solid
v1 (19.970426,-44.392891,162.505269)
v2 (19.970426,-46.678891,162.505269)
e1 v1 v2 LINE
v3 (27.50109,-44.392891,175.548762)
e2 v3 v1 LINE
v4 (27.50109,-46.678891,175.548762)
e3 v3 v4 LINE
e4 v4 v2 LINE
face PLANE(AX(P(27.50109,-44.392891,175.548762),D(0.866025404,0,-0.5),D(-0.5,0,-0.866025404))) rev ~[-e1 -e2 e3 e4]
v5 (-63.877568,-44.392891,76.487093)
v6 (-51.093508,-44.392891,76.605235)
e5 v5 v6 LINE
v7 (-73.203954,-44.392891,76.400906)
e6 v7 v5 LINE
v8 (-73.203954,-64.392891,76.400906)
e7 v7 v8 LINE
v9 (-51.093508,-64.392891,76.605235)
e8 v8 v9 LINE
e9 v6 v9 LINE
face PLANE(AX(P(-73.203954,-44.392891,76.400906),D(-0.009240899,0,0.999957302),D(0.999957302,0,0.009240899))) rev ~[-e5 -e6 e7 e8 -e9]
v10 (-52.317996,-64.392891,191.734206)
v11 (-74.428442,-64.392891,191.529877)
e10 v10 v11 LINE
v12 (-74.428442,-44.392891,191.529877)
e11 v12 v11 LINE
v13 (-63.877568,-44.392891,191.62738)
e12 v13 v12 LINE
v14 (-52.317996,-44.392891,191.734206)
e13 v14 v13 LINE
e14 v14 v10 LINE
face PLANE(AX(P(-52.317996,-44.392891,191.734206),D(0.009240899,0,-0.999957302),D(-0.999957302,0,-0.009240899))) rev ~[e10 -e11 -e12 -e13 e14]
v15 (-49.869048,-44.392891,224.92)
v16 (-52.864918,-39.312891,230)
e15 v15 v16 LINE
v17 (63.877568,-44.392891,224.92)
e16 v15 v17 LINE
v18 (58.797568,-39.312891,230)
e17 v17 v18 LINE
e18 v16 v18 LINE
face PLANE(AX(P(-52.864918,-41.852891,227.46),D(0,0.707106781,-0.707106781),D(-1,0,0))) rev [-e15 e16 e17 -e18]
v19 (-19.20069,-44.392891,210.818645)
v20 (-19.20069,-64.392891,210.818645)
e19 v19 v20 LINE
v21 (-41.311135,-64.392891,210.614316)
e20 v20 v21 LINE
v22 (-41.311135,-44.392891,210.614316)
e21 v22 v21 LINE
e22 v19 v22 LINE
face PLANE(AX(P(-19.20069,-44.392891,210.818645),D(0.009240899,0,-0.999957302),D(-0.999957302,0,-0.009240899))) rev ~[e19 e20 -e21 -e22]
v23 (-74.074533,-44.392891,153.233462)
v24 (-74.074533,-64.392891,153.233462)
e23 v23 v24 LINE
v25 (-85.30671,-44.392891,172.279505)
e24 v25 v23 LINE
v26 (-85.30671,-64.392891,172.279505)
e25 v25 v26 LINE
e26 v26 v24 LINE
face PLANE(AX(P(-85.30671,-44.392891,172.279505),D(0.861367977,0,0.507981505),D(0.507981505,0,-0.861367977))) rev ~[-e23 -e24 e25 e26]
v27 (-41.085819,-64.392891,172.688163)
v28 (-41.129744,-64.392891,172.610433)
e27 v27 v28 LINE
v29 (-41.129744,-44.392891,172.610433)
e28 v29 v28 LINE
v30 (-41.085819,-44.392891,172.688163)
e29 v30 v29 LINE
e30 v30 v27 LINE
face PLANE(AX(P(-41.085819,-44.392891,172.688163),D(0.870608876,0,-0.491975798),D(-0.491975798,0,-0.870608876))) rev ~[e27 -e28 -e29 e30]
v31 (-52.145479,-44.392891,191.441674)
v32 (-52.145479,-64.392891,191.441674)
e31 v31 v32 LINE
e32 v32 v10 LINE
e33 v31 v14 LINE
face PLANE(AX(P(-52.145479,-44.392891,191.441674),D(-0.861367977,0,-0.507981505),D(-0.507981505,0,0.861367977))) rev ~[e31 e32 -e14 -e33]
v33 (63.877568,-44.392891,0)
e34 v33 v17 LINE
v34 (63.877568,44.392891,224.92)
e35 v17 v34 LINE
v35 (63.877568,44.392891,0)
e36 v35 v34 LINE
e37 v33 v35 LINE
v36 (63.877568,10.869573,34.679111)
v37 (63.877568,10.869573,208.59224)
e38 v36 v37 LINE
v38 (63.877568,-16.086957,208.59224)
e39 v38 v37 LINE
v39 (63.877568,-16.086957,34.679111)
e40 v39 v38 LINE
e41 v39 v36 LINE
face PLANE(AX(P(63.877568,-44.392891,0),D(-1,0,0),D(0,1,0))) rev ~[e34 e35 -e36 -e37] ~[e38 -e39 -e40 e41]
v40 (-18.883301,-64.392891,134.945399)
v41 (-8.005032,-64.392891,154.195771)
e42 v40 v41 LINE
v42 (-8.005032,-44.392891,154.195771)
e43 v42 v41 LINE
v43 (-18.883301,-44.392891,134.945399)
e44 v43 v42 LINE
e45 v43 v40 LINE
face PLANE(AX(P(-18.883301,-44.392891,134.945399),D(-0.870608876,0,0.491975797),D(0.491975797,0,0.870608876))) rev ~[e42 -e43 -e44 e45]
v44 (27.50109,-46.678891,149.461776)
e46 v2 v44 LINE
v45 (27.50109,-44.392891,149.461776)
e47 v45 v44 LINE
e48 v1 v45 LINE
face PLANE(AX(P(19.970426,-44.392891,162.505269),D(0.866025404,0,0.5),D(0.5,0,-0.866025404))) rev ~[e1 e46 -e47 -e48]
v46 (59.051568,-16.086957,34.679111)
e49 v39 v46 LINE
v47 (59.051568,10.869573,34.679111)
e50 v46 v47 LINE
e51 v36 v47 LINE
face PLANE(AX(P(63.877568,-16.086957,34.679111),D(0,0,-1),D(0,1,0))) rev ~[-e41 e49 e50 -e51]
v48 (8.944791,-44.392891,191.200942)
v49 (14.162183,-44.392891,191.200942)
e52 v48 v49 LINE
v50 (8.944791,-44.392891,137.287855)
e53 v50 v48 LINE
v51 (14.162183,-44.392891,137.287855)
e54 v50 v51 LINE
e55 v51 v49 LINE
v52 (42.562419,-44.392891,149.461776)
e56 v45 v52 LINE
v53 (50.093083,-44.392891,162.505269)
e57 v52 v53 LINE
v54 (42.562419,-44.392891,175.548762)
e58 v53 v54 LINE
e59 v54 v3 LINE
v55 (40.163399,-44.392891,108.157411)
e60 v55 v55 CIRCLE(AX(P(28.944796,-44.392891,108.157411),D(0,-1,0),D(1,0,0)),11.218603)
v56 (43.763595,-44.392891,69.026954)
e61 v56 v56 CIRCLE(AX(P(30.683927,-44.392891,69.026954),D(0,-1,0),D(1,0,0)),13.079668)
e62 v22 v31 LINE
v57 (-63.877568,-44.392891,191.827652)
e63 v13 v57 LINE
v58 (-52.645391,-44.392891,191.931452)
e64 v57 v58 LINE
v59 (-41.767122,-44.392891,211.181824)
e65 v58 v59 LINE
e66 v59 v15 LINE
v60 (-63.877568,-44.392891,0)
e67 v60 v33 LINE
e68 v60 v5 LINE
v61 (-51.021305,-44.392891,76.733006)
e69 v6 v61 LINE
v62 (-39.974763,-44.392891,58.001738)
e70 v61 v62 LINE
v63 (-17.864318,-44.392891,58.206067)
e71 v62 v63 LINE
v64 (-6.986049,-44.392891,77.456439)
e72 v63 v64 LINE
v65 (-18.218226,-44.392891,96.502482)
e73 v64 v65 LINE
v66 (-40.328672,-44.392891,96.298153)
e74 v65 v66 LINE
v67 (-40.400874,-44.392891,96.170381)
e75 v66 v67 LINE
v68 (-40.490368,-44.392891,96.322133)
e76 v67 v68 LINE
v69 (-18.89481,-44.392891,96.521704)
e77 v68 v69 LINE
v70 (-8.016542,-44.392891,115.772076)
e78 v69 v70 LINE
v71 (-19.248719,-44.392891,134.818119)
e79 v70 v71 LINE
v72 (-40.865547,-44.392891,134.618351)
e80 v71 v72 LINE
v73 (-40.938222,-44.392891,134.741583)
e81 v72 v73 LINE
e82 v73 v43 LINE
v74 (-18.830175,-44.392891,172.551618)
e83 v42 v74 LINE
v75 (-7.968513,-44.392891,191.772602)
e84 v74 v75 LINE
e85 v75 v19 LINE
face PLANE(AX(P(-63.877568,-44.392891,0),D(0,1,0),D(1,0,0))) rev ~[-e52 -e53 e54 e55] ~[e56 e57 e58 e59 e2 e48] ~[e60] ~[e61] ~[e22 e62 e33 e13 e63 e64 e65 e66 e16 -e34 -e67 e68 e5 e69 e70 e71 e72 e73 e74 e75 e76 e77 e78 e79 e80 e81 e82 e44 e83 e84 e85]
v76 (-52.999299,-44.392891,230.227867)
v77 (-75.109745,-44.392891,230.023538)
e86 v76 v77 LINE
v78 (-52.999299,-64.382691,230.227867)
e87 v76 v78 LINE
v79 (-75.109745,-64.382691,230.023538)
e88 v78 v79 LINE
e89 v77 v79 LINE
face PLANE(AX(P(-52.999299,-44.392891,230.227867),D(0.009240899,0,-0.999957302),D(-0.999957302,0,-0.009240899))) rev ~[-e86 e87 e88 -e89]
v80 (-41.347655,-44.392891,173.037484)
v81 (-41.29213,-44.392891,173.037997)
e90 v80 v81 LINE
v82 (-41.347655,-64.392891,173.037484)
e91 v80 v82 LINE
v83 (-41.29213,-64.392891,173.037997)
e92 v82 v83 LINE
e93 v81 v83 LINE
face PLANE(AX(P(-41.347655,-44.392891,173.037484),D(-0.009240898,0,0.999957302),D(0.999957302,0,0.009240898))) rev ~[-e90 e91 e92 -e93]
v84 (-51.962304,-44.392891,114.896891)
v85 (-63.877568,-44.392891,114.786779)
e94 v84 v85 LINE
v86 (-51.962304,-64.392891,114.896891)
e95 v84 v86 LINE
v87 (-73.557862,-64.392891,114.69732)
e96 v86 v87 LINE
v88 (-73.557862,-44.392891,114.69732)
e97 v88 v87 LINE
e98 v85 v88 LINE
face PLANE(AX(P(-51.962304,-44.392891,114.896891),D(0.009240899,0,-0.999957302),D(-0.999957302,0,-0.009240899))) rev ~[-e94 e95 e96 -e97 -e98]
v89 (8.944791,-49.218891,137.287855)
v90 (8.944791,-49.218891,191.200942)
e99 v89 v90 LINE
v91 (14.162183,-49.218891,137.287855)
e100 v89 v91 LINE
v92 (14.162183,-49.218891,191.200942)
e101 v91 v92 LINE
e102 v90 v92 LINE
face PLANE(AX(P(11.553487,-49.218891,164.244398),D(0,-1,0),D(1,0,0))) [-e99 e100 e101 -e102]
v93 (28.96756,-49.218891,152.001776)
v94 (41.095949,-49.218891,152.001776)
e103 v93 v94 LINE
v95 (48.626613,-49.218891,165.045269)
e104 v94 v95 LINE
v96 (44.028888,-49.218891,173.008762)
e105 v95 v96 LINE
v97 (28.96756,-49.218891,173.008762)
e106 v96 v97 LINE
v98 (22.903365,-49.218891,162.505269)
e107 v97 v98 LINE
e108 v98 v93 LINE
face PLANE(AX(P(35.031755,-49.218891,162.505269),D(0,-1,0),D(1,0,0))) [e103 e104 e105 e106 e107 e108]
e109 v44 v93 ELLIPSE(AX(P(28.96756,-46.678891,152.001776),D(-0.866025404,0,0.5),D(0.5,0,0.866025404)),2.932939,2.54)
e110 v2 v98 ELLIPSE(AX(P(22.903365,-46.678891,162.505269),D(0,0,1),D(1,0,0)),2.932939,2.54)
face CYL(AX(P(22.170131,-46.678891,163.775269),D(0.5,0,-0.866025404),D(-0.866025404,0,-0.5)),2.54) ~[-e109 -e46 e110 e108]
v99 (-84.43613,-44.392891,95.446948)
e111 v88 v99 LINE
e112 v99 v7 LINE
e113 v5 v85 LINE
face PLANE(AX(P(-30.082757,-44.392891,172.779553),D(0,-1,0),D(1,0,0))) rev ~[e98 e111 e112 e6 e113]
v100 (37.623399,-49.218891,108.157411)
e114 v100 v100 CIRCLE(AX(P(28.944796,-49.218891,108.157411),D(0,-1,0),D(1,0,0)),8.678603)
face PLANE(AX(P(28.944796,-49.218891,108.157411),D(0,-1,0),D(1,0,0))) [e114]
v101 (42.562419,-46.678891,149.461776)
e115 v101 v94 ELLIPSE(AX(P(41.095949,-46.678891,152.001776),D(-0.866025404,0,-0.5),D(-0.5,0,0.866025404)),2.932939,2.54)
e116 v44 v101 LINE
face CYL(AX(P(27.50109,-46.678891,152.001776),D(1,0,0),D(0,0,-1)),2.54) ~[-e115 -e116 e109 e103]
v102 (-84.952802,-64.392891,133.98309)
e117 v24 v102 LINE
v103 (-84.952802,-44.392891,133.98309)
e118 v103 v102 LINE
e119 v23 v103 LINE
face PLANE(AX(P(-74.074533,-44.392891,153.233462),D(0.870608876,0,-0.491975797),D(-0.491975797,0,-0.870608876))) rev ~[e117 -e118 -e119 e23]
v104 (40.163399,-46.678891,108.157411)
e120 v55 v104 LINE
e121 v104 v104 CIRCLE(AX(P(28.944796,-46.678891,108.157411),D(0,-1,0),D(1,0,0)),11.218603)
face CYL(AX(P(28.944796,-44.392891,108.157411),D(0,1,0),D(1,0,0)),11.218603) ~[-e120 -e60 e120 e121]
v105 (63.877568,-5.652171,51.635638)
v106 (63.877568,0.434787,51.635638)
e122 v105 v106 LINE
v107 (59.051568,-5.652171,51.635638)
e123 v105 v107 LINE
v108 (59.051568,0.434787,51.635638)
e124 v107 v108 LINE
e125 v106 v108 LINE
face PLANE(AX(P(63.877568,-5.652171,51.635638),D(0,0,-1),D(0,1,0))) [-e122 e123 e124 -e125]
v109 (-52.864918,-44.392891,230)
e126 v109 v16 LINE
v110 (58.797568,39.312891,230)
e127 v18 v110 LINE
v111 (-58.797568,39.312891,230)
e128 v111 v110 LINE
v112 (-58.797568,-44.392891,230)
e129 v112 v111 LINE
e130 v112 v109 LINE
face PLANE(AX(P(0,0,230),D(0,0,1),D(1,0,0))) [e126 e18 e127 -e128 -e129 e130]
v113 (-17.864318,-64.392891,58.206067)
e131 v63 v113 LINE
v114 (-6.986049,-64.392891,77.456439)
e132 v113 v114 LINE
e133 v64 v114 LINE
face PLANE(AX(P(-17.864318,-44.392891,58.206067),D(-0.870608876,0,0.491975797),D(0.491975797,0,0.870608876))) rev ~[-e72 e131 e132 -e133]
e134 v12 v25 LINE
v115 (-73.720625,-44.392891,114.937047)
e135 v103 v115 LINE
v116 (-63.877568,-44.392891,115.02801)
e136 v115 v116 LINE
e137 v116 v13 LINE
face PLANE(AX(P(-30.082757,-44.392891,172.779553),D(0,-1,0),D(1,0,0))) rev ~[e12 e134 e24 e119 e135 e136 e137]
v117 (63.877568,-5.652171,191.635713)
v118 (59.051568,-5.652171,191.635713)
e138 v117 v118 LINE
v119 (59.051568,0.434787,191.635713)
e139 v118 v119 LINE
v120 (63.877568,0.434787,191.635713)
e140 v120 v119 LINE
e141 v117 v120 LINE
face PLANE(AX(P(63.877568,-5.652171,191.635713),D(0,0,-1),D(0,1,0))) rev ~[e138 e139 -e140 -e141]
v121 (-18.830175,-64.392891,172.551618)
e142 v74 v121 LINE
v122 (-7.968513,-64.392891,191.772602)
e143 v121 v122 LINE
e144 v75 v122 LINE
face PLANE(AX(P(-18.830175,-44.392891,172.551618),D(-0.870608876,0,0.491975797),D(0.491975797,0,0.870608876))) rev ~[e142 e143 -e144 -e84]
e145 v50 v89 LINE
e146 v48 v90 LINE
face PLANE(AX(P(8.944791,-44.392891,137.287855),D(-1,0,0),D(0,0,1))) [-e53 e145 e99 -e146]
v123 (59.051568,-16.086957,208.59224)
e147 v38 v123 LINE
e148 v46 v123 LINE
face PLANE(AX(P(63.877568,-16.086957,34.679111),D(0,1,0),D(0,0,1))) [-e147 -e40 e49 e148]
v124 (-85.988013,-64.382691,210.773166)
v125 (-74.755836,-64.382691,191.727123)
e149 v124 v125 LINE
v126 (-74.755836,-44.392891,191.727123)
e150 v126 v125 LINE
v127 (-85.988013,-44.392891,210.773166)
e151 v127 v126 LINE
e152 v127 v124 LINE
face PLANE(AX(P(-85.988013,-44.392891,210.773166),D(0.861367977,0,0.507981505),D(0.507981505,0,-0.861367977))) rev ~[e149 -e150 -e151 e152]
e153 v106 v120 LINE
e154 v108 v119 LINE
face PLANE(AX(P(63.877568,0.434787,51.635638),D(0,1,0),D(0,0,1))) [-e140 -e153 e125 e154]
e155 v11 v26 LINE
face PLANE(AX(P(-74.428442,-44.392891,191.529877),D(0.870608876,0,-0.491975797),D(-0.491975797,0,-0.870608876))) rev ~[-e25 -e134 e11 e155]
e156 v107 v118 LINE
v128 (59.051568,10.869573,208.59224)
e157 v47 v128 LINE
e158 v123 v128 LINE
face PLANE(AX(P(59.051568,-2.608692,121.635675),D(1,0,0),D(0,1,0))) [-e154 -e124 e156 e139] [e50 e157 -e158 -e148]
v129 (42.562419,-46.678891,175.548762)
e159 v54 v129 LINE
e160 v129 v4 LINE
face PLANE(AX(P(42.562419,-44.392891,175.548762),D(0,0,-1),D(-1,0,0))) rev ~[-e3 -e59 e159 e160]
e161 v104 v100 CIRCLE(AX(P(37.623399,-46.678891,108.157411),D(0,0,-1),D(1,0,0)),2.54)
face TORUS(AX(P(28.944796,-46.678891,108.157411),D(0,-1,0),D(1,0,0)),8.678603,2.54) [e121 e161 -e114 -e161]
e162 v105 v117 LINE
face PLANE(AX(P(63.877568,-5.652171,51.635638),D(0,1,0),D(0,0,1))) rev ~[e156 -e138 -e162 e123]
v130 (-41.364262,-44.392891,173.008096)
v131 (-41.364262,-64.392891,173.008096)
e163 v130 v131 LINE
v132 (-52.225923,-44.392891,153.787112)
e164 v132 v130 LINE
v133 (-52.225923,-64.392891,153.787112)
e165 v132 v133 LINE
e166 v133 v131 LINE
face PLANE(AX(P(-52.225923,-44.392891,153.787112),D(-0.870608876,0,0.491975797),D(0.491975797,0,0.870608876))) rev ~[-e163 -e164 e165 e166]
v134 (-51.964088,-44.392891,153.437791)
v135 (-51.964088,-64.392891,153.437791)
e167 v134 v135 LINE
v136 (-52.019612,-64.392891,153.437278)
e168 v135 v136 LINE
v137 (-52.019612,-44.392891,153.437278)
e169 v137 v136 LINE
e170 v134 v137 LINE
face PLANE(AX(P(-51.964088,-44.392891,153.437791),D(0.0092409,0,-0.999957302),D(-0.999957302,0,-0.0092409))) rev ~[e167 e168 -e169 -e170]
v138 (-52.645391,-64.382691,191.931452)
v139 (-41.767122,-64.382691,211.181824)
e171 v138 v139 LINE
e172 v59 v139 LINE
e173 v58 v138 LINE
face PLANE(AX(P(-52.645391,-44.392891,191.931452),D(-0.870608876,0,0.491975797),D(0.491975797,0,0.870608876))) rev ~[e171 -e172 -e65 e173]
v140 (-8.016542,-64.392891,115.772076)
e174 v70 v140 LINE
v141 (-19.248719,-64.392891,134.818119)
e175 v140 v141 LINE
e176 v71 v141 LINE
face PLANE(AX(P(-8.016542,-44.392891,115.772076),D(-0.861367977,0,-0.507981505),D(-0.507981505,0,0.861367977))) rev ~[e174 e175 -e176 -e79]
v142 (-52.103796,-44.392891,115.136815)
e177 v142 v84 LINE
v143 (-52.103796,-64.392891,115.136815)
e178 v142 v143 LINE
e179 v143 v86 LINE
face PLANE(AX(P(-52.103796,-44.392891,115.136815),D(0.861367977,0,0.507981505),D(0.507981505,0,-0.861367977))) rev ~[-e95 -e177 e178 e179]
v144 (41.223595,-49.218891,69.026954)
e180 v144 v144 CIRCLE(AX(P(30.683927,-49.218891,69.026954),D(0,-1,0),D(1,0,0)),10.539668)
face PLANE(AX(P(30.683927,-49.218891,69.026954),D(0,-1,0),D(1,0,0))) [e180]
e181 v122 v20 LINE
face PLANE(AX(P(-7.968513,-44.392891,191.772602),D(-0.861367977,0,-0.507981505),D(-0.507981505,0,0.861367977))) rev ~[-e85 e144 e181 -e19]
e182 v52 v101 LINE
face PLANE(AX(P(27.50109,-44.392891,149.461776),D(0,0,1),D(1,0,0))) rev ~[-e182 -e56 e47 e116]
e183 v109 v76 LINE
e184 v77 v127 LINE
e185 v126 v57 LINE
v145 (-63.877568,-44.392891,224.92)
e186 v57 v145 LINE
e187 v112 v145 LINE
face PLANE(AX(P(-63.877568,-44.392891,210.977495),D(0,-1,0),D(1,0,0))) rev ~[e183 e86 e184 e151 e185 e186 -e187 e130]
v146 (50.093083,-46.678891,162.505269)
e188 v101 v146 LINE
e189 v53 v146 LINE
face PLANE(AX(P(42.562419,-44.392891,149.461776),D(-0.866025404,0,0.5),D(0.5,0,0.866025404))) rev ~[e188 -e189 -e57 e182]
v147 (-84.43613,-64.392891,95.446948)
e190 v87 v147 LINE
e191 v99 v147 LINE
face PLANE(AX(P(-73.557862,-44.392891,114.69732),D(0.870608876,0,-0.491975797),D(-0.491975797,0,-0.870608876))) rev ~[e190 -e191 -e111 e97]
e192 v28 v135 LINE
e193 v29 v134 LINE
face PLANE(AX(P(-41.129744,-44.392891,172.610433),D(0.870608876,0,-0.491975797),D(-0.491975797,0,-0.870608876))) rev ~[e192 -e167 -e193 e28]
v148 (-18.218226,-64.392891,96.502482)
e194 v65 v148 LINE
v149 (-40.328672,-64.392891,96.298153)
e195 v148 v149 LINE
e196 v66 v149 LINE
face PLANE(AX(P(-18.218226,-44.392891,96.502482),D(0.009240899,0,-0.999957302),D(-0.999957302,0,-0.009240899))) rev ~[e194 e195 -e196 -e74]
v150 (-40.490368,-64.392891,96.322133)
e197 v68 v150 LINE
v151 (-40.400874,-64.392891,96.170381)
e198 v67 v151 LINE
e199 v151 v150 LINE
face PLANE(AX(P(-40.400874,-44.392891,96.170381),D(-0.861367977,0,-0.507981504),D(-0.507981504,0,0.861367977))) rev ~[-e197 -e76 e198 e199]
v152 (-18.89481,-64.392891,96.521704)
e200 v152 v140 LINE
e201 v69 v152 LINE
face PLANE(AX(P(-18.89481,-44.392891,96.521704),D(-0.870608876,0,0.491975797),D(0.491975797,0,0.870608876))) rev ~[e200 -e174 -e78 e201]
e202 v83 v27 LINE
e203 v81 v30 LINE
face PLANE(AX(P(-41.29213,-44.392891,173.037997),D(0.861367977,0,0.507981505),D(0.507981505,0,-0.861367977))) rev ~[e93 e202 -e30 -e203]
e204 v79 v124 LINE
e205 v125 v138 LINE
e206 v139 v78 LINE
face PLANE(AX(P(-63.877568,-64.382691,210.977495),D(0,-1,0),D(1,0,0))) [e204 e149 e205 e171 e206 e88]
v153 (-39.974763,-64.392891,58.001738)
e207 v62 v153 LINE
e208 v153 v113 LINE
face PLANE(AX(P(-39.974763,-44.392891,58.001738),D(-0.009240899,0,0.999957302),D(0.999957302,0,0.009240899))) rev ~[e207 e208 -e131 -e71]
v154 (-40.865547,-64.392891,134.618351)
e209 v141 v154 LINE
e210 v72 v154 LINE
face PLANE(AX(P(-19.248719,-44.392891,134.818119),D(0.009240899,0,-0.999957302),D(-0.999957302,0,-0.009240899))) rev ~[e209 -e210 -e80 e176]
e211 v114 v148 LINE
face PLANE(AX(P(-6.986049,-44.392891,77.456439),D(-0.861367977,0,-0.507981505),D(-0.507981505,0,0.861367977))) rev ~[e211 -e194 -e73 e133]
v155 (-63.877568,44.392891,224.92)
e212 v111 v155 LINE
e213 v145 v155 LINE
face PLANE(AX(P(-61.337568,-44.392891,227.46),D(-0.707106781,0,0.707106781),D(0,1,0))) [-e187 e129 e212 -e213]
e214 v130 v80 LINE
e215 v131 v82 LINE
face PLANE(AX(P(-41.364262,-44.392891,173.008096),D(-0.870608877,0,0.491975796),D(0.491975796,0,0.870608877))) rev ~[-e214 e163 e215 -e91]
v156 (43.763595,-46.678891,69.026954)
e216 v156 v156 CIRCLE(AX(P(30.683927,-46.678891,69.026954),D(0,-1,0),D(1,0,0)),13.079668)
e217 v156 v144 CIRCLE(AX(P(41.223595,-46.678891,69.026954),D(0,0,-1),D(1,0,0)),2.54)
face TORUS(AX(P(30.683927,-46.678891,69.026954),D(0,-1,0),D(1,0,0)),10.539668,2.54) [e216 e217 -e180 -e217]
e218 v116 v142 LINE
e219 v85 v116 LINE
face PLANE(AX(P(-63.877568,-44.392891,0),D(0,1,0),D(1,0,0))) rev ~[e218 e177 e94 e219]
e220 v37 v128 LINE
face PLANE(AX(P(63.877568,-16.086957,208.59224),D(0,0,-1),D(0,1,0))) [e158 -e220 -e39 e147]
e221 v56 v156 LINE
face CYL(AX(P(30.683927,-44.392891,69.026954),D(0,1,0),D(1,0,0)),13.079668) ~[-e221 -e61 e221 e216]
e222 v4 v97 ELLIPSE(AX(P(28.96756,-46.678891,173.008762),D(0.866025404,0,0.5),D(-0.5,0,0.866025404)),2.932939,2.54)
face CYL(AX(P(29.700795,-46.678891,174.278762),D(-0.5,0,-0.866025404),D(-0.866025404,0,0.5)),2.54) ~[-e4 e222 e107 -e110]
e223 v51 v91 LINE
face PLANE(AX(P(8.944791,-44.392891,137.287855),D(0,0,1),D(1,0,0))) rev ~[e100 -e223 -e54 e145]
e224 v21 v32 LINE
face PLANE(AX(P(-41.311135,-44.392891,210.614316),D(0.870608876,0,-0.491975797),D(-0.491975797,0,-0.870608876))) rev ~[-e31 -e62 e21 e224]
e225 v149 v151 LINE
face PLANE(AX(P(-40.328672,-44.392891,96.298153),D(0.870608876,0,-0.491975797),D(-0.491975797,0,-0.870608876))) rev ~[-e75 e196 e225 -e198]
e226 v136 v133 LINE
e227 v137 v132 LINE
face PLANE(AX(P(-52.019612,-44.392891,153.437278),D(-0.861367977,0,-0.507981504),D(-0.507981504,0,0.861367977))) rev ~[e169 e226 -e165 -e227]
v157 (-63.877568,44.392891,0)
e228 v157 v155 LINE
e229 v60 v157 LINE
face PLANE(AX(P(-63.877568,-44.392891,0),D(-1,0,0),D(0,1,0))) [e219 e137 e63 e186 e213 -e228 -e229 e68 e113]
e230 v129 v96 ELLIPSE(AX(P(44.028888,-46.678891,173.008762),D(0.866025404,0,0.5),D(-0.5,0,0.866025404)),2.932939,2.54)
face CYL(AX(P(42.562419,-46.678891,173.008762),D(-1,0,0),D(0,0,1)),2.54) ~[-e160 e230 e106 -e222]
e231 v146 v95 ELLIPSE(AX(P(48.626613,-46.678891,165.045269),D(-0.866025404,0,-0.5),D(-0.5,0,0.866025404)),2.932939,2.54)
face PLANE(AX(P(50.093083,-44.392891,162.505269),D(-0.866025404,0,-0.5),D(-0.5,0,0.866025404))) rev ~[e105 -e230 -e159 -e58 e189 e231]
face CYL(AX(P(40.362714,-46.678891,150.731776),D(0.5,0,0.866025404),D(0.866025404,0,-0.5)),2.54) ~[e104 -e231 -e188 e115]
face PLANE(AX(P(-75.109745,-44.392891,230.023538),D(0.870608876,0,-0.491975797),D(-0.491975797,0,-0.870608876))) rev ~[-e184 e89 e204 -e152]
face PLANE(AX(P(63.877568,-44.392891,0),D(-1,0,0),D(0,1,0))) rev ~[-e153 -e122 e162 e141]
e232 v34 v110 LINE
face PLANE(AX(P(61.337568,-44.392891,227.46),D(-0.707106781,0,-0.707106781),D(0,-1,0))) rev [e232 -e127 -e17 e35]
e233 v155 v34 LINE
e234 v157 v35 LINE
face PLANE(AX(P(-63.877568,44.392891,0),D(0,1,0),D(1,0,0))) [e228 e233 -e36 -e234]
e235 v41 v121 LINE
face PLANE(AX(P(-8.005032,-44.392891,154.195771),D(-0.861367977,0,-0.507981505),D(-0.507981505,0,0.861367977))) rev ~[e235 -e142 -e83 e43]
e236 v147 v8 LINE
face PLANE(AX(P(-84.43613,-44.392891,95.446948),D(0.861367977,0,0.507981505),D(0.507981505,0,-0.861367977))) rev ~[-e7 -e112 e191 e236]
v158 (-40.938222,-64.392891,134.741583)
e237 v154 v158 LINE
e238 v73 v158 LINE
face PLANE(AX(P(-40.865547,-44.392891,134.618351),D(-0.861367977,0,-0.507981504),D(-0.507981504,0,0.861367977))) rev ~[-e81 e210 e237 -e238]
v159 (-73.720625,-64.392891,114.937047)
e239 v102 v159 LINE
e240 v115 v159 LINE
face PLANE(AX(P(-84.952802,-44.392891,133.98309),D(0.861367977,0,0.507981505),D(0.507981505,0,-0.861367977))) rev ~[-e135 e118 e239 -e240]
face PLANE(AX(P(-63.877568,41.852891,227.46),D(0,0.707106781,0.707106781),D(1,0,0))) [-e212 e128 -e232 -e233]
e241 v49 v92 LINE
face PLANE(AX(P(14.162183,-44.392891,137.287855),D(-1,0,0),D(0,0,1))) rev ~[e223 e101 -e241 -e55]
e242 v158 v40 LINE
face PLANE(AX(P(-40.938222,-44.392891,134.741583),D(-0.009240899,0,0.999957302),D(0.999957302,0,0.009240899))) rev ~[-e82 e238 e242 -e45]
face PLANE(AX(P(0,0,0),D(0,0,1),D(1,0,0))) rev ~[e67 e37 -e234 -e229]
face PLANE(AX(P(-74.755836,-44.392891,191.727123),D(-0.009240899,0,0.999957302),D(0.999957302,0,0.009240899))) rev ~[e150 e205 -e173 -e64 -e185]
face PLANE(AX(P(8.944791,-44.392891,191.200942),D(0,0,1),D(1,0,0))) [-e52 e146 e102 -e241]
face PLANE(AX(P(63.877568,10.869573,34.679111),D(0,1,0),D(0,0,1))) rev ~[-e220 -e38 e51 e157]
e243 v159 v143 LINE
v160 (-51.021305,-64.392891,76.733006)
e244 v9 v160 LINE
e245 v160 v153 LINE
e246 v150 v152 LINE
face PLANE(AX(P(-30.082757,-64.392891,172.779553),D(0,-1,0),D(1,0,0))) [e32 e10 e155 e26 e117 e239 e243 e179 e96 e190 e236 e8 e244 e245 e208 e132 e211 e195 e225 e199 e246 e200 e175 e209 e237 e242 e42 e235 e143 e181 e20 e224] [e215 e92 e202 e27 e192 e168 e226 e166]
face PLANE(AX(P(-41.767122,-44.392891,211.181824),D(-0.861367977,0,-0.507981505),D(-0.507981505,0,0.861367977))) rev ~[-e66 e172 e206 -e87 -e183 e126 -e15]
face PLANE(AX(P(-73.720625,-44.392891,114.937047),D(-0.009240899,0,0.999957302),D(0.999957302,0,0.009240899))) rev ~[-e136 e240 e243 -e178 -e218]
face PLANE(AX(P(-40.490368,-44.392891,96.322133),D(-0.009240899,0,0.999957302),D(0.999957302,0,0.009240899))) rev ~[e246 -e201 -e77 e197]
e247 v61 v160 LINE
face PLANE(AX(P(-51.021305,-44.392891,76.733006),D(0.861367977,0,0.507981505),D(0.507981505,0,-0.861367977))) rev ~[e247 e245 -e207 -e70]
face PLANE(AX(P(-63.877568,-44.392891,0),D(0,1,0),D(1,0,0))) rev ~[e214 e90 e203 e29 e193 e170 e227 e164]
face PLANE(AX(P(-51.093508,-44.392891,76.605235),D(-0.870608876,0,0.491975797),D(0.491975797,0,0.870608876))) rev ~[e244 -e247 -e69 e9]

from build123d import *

# Parameters (mm, degrees)
F0_W      = 127.7551352978
F0_H      = 88.7857824564
F1_DEPTH  = 230
F4_DEPTH  = 20
F5_DEPTH  = 19.9898
F6_W      = 26.9565298222
F6_H      = 173.913128674
F6_W_2    = 6.0869585723
F6_H_2    = 140.0000751019
F7_DEPTH  = 4.826
F8_SIZE   = 5.08
F9_R      = 13.0796675924
F9_R_2    = 11.2186028003
F9_W      = 5.2173919976
F9_H      = 53.9130866528
F10_DEPTH = 4.826
F11_R     = 2.54


with BuildPart() as f1:
    # F0 (on Top) → F1 (new body)
    with BuildSketch(Plane.XY):
        Rectangle(F0_W, F0_H)
    extrude(amount=F1_DEPTH)

    # F3 (on face) → F4 (join)
    with BuildSketch(Plane.XZ.offset(44.3928912282)):
        Polygon((-41.2921301063, 173.0379974811), (-41.085819379, 172.688162985), (-41.1297441764, 172.6104329043), (-40.9572269026, 172.3179008855), (-18.8467815635, 172.5222300093), (-18.8301746286, 172.5516179285), (-19.2372092384, 173.2418134869), align=None)
        Polygon((-40.9572269026, 172.3179008855), (-41.1297441764, 172.6104329043), (-51.9640878366, 153.4377910705), (-40.9382216824, 134.7415827759), (-18.8833008145, 134.9453987817), (-8.0050323569, 154.1957706962), (-18.8301746286, 172.5516179285), (-18.8467815635, 172.5222300093), align=None)
        Polygon((-41.3476545775, 173.0374843632), (-41.2921301063, 173.0379974811), (-52.1454789867, 191.4416737569), (-52.1894037841, 191.3639436762), (-41.3642615124, 173.008096444), align=None)
        Polygon((-52.1454789867, 191.4416737569), (-41.2921301063, 173.0379974811), (-19.2372092384, 173.2418134869), (-18.8301746286, 172.5516179285), (-7.968513106, 191.7726019238), (-19.2006899874, 210.8186447145), (-41.3111353265, 210.6143155907), align=None)
        Polygon((-40.9382216824, 134.7415827759), (-51.9640878366, 153.4377910705), (-52.0196123078, 153.4372779525), (-40.9937461536, 134.7410696579), align=None)
        Polygon((-52.225923035, 153.7871124486), (-41.3642615124, 173.008096444), (-52.1894037841, 191.3639436762), (-52.1454789867, 191.4416737569), (-52.3179962605, 191.7342057757), (-74.4284415995, 191.5298766519), (-85.3067100571, 172.2795047374), (-74.0745331757, 153.2334619467), (-52.0196123078, 153.4372779525), align=None)
        Polygon((-40.9937461536, 134.7410696579), (-52.0196123078, 153.4372779525), (-74.0745331757, 153.2334619467), (-84.9528016333, 133.9830900322), (-73.7206247518, 114.9370472415), (-52.1037964015, 115.1368147056), (-52.2374327127, 115.3634175206), (-41.3591642551, 134.6137894351), (-40.8655472663, 134.6183510948), (-40.9382216824, 134.7415827759), align=None)
        Polygon((-19.248718916, 134.8181185589), (-40.8655472663, 134.6183510948), (-40.7319109552, 134.3917482798), (-51.6101794127, 115.1413763653), (-52.1037964015, 115.1368147056), (-51.9623043786, 114.8968912116), (-51.4474166697, 114.9016494402), (-40.4903681222, 96.3221329585), (-18.8948104921, 96.5217038537), (-8.0165420346, 115.7720757682), align=None)
        Polygon((-40.7319109552, 134.3917482798), (-40.8655472663, 134.6183510948), (-41.3591642551, 134.6137894351), (-52.2374327127, 115.3634175206), (-52.1037964015, 115.1368147056), (-51.6101794127, 115.1413763653), align=None)
        Polygon((-41.0052558312, 96.3173747299), (-51.9623043786, 114.8968912116), (-73.5578620087, 114.6973203164), (-84.4361304663, 95.4469484019), (-73.2039535849, 76.4009056112), (-51.0935082458, 76.605234735), (-51.0213053835, 76.7330061684), (-51.2069400891, 77.0477809963), (-40.4008744938, 96.1703814775), (-40.4903681222, 96.3221329585), align=None)
        Polygon((-51.4474166697, 114.9016494402), (-51.9623043786, 114.8968912116), (-41.0052558312, 96.3173747299), (-40.4903681222, 96.3221329585), align=None)
        Polygon((-40.3286716315, 96.2981529109), (-40.4008744938, 96.1703814775), (-40.2152397882, 95.8556066495), (-51.0213053835, 76.7330061684), (-39.9747632076, 58.0017382056), (-17.8643178685, 58.2060673294), (-6.986049411, 77.4564392439), (-18.2182262924, 96.5024820346), align=None)
        Polygon((-40.2152397882, 95.8556066495), (-40.4008744938, 96.1703814775), (-51.2069400891, 77.0477809963), (-51.0213053835, 76.7330061684), align=None)
    extrude(amount=F4_DEPTH)

    # F2 (on face) → F5 (join)
    with BuildSketch(Plane.XZ.offset(44.3928912282)):
        Polygon((-52.6453907674, 191.9314519259), (-41.7671223098, 211.1818238404), (-52.9992991913, 230.2278666311), (-75.1097445304, 230.0235375074), (-85.9880129879, 210.7731655929), (-74.7558361065, 191.7271228021), align=None)
    extrude(amount=F5_DEPTH)

    # F6 (on face) → F7 (cut)
    with BuildSketch(Plane.YZ.offset(63.8775676489)):
        with Locations((-2.6086920407, 121.6356754303)):
            Rectangle(F6_W, F6_H)
        with Locations((-2.6086920407, 121.6356754303)):
            Rectangle(F6_W_2, F6_H_2, mode=Mode.SUBTRACT)
    extrude(amount=-F7_DEPTH, mode=Mode.SUBTRACT)

    # F8
    f8_edges = [f1.edges().sort_by_distance(p)[0] for p in [
        (5.506325, -44.392891, 230),
        (63.877568, 0, 230),
        (0, 44.392891, 230),
        (-63.877568, 0, 230),
    ]]
    chamfer(f8_edges, length=F8_SIZE)

    # F9 (on face) → F10 (join)
    with BuildSketch(Plane.XZ.offset(44.3928912282)):
        with Locations((30.683927238, 69.0269544721)):
            Circle(F9_R)
        with Locations((28.9447959512, 108.1574112177)):
            Circle(F9_R_2)
        with Locations((11.5534868091, 164.2443984747)):
            Rectangle(F9_W, F9_H)
        Polygon((27.5010903101, 149.4617760181), (42.562418737, 149.4617760181), (50.0930829504, 162.5052690506), (42.562418737, 175.5487620831), (27.5010903101, 175.5487620831), (19.9704260966, 162.5052690506), align=None)
    extrude(amount=F10_DEPTH)

    # F11
    f11_edges = [f1.edges().sort_by_distance(p)[0] for p in [
        (35.031755, -49.218891, 175.548762),
        (46.327751, -49.218891, 155.983523),
        (35.031755, -49.218891, 149.461776),
        (23.735758, -49.218891, 155.983523),
        (23.735758, -49.218891, 169.027016),
        (17.726193, -49.218891, 108.157411),
        (17.60426, -49.218891, 69.026954),
    ]]
    fillet(f11_edges, radius=F11_R)


solid = f1.part
